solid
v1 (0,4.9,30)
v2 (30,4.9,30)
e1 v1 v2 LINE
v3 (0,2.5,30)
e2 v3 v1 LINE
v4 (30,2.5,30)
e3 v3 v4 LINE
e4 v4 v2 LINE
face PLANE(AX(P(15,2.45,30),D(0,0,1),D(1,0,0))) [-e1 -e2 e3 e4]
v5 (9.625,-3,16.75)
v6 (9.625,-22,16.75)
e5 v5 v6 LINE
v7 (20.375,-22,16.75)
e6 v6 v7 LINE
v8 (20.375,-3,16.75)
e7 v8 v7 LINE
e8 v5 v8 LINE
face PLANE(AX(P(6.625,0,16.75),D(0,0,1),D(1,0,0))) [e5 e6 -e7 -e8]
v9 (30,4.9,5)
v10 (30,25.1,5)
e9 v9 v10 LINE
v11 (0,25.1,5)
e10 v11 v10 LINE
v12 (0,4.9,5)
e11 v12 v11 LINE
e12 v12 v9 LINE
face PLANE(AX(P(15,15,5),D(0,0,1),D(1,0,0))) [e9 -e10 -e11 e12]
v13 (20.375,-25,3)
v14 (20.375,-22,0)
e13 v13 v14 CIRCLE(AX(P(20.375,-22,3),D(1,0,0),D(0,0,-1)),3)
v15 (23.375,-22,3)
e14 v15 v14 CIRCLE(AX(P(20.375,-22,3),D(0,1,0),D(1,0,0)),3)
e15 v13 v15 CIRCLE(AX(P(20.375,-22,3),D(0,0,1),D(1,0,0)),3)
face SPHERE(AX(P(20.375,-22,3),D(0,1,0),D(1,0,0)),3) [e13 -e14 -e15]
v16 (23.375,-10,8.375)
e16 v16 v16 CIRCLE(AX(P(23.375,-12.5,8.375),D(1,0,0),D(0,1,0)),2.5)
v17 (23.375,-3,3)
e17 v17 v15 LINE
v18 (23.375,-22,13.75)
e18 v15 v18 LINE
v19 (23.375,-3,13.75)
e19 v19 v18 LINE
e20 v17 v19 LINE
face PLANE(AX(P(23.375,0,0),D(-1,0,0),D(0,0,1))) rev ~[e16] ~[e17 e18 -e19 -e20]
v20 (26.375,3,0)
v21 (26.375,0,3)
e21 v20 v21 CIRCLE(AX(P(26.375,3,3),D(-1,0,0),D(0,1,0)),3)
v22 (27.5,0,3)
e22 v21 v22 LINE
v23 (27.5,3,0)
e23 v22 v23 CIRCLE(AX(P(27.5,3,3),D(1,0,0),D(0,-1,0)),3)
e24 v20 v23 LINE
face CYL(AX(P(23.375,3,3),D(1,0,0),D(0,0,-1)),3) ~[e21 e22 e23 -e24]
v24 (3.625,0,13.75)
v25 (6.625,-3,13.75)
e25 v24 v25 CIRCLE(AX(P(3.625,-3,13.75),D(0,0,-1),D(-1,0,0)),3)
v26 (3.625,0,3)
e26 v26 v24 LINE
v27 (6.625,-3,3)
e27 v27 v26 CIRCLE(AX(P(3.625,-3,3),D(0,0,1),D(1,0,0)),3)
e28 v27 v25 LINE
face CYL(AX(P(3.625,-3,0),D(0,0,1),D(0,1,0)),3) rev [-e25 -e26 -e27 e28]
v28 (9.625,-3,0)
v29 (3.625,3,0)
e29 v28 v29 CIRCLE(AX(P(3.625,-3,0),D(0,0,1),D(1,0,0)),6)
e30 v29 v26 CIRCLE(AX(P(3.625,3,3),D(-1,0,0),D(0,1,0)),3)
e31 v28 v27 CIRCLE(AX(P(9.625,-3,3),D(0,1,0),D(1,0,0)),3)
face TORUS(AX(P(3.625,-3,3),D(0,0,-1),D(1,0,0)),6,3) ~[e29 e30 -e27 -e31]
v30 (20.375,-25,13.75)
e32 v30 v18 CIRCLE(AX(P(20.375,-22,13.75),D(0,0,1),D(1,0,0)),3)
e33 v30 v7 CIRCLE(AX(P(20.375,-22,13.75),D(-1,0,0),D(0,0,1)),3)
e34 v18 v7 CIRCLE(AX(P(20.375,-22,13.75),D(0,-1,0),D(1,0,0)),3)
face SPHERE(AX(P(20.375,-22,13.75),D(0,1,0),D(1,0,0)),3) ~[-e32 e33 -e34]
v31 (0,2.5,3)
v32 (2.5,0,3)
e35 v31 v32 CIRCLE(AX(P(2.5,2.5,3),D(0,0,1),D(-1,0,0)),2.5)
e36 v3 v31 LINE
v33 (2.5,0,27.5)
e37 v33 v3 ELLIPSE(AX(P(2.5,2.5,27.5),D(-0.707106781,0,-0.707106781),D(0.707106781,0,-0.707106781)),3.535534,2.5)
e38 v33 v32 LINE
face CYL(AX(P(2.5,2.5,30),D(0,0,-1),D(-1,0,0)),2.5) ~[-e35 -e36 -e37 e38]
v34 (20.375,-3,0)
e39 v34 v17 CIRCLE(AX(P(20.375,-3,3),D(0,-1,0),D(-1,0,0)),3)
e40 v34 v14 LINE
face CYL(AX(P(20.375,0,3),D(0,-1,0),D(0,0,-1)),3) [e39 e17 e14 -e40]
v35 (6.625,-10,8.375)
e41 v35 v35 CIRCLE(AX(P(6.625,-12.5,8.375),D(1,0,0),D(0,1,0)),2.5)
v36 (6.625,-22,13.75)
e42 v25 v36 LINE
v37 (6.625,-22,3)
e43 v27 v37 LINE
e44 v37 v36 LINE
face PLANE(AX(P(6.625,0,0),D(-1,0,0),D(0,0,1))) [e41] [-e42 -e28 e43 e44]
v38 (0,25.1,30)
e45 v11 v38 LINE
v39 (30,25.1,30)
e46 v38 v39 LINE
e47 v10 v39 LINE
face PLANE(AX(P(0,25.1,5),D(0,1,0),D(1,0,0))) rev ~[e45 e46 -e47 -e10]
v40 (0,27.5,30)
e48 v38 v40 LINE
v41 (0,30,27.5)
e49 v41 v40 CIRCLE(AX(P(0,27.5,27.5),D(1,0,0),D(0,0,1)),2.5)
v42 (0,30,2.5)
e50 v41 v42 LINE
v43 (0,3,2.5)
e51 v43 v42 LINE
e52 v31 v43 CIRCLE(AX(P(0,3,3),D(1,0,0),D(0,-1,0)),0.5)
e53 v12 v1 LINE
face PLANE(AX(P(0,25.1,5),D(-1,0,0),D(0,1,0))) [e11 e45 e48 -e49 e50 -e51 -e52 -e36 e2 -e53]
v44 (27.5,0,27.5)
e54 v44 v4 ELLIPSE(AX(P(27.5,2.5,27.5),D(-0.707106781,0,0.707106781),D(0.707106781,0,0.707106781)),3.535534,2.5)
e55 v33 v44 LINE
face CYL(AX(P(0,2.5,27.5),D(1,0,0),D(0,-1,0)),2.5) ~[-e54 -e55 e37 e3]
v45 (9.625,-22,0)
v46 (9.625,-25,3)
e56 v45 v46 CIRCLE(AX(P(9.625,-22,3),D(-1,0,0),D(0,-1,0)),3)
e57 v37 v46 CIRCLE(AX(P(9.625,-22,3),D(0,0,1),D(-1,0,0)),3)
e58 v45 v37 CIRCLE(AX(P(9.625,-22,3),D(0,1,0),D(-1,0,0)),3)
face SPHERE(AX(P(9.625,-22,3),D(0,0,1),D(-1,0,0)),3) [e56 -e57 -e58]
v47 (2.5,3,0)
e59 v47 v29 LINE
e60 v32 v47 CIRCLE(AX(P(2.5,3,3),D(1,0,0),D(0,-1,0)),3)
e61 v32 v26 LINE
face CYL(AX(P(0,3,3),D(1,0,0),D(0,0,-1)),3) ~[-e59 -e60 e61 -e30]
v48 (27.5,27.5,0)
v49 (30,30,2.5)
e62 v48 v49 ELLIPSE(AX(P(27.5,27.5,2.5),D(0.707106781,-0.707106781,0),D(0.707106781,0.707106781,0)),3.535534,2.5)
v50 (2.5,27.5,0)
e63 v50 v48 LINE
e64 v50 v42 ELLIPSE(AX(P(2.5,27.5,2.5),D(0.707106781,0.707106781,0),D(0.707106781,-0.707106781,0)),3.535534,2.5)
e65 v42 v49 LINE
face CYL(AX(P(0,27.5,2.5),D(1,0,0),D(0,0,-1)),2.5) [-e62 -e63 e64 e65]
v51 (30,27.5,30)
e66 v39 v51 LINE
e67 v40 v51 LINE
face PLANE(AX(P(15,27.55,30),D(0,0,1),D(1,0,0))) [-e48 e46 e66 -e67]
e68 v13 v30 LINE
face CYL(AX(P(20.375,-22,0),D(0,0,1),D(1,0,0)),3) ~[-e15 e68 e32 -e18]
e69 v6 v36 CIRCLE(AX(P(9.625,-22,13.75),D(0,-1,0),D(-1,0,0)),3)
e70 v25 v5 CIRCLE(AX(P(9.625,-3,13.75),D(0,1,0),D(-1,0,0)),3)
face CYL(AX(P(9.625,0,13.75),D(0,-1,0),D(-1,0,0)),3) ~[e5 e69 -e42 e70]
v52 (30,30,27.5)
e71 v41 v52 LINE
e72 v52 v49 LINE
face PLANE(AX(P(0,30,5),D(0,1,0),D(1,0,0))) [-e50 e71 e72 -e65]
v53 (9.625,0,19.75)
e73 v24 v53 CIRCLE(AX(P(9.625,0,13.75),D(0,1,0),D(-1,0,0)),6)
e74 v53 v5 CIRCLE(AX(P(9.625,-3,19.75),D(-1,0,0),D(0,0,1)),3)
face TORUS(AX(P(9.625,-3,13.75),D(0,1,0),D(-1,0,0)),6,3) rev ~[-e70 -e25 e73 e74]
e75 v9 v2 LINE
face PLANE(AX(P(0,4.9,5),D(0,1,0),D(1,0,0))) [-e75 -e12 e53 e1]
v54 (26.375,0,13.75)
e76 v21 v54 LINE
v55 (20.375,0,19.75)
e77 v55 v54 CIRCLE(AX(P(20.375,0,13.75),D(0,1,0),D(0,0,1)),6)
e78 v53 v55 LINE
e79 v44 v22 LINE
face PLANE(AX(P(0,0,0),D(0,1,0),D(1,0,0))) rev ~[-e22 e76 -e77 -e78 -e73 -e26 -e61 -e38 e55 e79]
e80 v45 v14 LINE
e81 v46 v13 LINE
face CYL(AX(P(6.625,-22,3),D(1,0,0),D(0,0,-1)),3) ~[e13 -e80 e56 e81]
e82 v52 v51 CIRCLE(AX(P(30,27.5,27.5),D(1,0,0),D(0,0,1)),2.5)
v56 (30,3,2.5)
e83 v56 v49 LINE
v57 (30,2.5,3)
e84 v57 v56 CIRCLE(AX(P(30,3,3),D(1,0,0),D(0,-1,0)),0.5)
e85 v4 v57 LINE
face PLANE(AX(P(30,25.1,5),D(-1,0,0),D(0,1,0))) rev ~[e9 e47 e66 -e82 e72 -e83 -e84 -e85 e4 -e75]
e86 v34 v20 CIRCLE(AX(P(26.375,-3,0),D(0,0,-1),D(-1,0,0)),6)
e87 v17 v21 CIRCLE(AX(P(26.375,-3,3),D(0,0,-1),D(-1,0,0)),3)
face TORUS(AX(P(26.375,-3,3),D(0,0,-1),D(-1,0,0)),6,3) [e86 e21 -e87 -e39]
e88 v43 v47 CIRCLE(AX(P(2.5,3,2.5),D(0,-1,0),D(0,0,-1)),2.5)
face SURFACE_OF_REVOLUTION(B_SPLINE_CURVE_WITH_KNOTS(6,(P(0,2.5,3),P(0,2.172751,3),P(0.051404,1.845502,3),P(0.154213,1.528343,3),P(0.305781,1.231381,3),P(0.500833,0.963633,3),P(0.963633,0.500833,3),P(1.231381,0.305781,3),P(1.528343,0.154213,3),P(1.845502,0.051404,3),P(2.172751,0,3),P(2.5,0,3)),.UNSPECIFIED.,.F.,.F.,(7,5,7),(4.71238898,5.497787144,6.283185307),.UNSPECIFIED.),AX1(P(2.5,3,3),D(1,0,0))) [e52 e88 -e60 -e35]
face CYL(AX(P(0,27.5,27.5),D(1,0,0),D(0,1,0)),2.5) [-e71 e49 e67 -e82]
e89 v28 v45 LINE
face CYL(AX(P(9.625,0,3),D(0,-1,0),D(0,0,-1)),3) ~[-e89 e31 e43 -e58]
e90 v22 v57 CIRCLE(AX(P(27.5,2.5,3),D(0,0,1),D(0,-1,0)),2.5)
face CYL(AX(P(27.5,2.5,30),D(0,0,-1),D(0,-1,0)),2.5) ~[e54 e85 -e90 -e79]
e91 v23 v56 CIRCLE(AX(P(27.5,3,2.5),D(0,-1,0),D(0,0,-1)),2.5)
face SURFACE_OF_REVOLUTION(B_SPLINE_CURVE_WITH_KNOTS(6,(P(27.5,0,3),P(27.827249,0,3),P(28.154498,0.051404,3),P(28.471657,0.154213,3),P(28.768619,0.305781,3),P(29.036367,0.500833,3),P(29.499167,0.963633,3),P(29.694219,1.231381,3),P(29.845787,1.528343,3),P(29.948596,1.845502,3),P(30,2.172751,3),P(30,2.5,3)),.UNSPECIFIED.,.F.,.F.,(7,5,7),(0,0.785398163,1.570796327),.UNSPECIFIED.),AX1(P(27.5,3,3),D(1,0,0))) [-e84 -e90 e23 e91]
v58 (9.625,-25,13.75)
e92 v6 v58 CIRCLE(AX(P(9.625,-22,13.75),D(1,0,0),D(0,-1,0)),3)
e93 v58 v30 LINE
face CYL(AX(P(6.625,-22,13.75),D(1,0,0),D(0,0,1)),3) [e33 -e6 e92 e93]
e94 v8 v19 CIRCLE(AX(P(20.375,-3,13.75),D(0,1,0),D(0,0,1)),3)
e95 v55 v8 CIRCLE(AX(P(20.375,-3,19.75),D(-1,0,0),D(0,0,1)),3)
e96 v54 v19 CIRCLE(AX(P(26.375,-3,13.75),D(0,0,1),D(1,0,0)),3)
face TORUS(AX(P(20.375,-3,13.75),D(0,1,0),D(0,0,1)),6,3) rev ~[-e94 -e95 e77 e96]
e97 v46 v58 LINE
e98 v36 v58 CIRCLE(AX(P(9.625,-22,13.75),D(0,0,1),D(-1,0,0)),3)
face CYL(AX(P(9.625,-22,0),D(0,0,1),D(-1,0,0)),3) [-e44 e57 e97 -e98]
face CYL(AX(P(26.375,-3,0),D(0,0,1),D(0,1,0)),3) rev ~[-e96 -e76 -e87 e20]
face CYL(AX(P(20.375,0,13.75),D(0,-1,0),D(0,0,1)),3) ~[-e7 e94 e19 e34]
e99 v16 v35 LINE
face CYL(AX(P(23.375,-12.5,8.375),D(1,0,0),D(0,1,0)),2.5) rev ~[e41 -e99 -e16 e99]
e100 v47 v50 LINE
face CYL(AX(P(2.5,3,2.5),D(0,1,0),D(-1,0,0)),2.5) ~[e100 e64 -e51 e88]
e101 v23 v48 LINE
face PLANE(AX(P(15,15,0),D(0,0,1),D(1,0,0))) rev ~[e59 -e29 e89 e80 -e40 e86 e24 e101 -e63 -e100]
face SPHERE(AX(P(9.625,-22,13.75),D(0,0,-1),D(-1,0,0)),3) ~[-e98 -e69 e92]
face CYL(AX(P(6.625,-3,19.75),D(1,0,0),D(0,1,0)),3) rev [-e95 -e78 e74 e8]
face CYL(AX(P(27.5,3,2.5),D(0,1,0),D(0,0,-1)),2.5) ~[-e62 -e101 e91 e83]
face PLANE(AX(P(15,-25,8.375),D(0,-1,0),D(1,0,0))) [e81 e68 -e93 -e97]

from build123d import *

# Parameters (mm, degrees)
F0_W      = 30
F0_H      = 30
F1_DEPTH  = 5
F2_W      = 30
F2_H      = 4.9
F3_DEPTH  = 25
F4_W      = 16.75
F4_H      = 16.75
F5_DEPTH  = 25
F6_R      = 3
F7_R      = 2.5
F9_R      = 2.5
F10_DEPTH = 16.75


# Not quite as in the source:
# - two fillets or chamfers of one size are made in one step
# - a feature names something its author has since deleted; it is built from what else it names


with BuildPart() as f1:
    # F0 (on Top) → F1 (new body)
    with BuildSketch(Plane.XY):
        with Locations((15, 15)):
            Rectangle(F0_W, F0_H)
    extrude(amount=F1_DEPTH)

    # F2 (on face) → F3 (join)
    with BuildSketch(Plane.XY.offset(5)):
        with Locations((15, 27.55)):
            Rectangle(F2_W, F2_H)
        with Locations((15, 2.45)):
            Rectangle(F2_W, F2_H)
    extrude(amount=F3_DEPTH)

    # F4 (on face) → F5 (join)
    with BuildSketch(Plane.XZ):
        with Locations((15, 8.375)):
            Rectangle(F4_W, F4_H)
    extrude(amount=F5_DEPTH)

    # F6
    f6_edges = [f1.edges().sort_by_distance(p)[0] for p in [
        (6.625, -25, 8.375),
        (23.375, 0, 8.375),
        (23.375, -12.5, 0),
        (23.375, -12.5, 16.75),
        (23.375, -25, 8.375),
        (3.3125, 0, 0),
        (6.625, 0, 8.375),
        (15, 0, 16.75),
        (26.6875, 0, 0),
        (6.625, -12.5, 0),
        (15, -25, 0),
        (6.625, -12.5, 16.75),
        (15, -25, 16.75),
    ]]
    fillet(f6_edges, radius=F6_R)

    # F7
    f7_edges = [f1.edges().sort_by_distance(p)[0] for p in [
        (15, 30, 30),
        (15, 0, 30),
        (15, 30, 0),
        (30, 16.5, 0),
        (0, 16.5, 0),
        (0, 0, 16.5),
        (0, 0.87868, 0.87868),
        (30, 0, 16.5),
        (30, 0.87868, 0.87868),
    ]]
    fillet(f7_edges, radius=F7_R)

    # F9 (on face) → F10 (cut, through all)
    with BuildSketch(Plane.YZ.offset(23.375)):
        with Locations((-12.5, 8.375)):
            Circle(F9_R)
    extrude(amount=-F10_DEPTH, mode=Mode.SUBTRACT)


solid = f1.part
